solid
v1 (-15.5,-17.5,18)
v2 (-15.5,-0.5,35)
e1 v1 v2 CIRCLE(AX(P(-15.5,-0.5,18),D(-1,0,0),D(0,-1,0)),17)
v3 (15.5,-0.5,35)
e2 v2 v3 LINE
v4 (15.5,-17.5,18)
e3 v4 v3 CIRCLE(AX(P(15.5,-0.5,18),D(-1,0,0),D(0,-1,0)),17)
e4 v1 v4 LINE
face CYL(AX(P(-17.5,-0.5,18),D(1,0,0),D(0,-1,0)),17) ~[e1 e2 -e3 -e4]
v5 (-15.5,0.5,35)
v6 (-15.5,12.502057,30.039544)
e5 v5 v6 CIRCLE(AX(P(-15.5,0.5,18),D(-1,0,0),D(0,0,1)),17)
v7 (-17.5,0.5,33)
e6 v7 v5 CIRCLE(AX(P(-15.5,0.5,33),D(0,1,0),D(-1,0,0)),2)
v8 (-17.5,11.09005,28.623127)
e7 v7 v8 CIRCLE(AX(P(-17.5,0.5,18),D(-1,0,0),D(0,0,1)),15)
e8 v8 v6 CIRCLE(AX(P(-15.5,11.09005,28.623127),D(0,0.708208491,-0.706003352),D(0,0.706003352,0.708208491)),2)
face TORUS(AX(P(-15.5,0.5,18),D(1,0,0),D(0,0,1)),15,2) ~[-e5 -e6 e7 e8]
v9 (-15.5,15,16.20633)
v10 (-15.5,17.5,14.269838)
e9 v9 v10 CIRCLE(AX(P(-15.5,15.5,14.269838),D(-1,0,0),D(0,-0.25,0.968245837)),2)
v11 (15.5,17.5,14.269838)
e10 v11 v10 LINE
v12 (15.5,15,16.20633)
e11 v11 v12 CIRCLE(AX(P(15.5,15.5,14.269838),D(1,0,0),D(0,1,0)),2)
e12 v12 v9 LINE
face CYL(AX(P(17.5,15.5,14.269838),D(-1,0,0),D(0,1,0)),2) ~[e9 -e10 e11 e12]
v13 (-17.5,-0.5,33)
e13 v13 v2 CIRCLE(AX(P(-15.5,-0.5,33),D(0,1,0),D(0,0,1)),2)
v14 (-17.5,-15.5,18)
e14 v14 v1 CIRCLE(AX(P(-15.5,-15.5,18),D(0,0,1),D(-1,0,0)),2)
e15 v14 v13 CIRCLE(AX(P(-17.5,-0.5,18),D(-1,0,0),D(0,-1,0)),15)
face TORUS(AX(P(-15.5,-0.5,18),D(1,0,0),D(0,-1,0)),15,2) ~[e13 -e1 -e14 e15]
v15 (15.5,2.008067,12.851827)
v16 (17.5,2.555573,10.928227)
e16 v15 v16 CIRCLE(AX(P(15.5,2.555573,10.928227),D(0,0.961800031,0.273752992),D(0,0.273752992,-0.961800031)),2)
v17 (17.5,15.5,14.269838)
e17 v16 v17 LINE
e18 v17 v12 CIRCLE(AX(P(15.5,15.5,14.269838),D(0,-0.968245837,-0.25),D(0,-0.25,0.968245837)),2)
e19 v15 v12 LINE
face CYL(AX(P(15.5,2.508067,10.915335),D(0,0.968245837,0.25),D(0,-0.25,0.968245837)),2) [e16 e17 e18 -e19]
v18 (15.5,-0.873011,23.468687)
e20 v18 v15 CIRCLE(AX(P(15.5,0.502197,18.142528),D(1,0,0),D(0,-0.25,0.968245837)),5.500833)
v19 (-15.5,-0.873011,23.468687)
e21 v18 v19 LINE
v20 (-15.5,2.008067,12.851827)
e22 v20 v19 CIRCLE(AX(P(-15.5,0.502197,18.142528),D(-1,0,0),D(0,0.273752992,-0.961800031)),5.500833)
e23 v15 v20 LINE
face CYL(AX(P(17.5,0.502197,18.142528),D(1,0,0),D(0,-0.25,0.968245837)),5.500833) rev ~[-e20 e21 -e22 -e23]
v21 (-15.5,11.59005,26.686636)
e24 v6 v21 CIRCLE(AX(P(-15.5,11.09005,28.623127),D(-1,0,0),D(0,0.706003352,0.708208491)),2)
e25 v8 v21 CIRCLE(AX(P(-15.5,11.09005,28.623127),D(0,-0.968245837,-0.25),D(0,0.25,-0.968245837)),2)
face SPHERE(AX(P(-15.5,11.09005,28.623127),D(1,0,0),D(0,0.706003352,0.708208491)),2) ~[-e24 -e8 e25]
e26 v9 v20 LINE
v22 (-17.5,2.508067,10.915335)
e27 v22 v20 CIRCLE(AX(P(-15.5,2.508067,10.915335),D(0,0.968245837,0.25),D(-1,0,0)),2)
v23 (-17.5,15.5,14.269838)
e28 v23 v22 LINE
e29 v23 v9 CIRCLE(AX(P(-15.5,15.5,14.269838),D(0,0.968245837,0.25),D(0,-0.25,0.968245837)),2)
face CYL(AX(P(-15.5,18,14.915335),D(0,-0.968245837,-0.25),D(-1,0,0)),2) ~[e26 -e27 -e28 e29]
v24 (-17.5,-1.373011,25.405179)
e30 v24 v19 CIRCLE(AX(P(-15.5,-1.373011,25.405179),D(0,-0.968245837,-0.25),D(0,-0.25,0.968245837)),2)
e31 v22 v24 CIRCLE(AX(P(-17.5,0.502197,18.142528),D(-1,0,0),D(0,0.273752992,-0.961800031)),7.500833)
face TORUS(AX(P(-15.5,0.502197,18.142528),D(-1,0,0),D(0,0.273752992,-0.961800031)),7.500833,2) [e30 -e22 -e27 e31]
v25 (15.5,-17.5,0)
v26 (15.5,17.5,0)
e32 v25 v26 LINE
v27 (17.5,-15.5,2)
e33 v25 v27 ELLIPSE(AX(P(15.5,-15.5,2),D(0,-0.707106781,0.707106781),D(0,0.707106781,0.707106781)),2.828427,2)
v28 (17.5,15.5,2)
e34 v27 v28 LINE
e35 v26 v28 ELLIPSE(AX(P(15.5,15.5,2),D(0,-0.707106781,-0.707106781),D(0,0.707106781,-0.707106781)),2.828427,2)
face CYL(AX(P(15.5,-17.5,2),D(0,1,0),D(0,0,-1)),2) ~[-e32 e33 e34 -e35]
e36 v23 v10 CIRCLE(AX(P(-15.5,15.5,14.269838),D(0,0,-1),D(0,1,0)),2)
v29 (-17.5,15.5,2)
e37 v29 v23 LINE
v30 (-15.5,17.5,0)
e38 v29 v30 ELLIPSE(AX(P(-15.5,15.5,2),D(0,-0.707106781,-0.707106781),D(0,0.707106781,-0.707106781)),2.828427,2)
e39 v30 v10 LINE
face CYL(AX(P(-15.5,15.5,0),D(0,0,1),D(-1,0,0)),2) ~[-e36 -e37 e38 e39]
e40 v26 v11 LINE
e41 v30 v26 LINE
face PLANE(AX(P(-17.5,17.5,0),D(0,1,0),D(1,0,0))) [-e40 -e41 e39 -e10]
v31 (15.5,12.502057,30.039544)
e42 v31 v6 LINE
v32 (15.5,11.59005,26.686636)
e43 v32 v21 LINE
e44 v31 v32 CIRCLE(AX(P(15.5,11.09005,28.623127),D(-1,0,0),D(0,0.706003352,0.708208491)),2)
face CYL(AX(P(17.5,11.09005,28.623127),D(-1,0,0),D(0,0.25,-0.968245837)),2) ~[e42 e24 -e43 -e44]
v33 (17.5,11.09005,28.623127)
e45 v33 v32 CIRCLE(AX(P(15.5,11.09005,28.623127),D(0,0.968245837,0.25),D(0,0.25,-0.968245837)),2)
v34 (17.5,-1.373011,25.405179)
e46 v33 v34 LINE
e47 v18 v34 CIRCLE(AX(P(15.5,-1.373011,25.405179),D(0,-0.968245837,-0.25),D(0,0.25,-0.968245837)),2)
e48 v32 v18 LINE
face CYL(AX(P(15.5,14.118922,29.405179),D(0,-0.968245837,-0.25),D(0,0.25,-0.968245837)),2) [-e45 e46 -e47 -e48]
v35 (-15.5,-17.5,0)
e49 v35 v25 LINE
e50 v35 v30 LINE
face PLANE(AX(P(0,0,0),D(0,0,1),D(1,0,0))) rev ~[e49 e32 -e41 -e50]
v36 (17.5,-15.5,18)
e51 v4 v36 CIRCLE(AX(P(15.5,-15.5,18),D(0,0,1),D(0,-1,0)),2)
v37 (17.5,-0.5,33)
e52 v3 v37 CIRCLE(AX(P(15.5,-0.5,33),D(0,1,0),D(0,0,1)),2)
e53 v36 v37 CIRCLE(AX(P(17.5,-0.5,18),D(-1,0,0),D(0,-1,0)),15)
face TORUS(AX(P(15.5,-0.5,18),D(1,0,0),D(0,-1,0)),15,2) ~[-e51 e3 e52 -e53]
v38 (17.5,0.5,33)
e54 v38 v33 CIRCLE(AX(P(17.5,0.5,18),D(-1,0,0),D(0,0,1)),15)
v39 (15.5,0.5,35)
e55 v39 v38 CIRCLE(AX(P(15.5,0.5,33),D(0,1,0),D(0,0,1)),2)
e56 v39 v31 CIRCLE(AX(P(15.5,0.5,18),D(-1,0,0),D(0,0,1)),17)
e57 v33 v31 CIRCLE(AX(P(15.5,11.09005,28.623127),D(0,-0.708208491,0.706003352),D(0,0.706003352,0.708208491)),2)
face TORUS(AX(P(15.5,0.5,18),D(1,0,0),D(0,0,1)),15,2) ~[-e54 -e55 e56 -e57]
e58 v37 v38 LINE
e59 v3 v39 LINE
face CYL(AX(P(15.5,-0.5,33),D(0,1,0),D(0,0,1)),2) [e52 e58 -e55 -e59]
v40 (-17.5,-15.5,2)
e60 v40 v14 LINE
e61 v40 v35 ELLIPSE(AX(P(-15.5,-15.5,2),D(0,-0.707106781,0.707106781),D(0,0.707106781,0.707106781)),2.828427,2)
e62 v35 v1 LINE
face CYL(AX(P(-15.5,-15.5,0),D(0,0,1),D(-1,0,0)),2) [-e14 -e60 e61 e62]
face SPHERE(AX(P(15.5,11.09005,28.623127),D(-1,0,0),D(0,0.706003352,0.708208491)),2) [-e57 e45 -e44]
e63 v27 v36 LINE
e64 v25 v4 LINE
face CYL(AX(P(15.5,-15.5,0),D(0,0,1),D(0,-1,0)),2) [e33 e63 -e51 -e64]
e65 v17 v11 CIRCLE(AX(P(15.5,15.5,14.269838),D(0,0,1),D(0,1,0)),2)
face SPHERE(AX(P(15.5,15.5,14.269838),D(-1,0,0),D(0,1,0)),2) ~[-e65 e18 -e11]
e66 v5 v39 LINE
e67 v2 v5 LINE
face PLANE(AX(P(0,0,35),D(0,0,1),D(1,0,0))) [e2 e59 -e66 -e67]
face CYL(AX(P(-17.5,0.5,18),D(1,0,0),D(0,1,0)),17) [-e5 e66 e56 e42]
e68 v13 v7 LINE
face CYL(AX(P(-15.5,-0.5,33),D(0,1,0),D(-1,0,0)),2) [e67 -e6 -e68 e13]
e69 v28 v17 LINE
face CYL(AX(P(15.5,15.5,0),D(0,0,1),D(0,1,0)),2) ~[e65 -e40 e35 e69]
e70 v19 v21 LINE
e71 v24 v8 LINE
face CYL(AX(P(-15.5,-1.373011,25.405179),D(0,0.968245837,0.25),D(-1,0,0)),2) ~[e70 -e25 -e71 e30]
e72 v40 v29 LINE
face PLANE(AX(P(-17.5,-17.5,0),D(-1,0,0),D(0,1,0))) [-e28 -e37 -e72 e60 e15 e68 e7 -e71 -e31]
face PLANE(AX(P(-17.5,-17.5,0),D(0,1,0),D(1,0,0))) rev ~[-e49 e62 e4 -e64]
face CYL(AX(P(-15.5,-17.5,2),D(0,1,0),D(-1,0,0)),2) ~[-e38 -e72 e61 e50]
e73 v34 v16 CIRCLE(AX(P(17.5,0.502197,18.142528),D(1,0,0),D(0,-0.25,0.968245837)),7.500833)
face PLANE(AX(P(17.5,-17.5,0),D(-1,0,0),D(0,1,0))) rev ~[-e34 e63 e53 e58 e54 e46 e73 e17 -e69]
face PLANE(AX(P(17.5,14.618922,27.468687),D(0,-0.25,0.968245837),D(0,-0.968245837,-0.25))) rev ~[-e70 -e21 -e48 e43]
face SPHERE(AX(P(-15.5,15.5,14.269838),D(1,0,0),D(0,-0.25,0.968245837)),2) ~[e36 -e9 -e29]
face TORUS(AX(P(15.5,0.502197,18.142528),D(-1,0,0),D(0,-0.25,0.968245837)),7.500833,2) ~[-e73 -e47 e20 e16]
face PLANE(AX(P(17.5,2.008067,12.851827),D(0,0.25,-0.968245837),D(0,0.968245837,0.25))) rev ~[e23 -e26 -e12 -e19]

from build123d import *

# Parameters (mm, degrees)
F0_W     = 35
F0_H     = 35
F1_DEPTH = 35
F2_R     = 17
F5_DEPTH = 35.001
F6_R     = 2


with BuildPart() as f1:
    # F0 (on Top) → F1 (new body)
    with BuildSketch(Plane.XY):
        Rectangle(F0_W, F0_H)
    extrude(amount=F1_DEPTH)

    # F2
    f2_edges = [f1.edges().sort_by_distance(p)[0] for p in [
        (0, -17.5, 35),
        (0, 17.5, 35),
    ]]
    fillet(f2_edges, radius=F2_R)

    # F4 (on face) → F5 (cut, through all)
    with BuildSketch(Plane.YZ.offset(17.5)):
        with BuildLine():
            ThreePointArc((17.5, 18), (16.7637891964, 22.9486524402), (14.6189222384, 27.4686870699))
            Line((14.6189222384, 27.4686870699), (-0.8730111465, 23.4686870699))
            ThreePointArc((-0.8730111465, 23.4686870699), (-4.8066349175, 16.7018804151), (2.0080666152, 12.8518270003))
            Line((2.0080666152, 12.8518270003), (17.5, 16.8518270003))
            Line((17.5, 16.8518270003), (17.5, 18))
        make_face()
    extrude(amount=-F5_DEPTH, mode=Mode.SUBTRACT)

    # F6
    f6_edges = [f1.edges().sort_by_distance(p)[0] for p in [
        (17.5, -17.5, 9),
        (17.5, 0, 0),
        (17.5, 17.5, 8.425914),
        (17.5, 9.754033, 14.851827),
        (17.5, -4.806635, 16.70188),
        (17.5, 6.872956, 25.468687),
        (17.5, 8.50101, 32.999461),
        (17.5, 0, 35),
        (17.5, -12.520815, 30.020815),
        (-17.5, 0, 0),
        (-17.5, -17.5, 9),
        (-17.5, -12.520815, 30.020815),
        (-17.5, 0, 35),
        (-17.5, 8.50101, 32.999461),
        (-17.5, 6.872956, 25.468687),
        (-17.5, -4.806635, 16.70188),
        (-17.5, 9.754033, 14.851827),
        (-17.5, 17.5, 8.425914),
        (0, 17.5, 16.851827),
        (0, 14.618922, 27.468687),
    ]]
    fillet(f6_edges, radius=F6_R)


solid = f1.part
